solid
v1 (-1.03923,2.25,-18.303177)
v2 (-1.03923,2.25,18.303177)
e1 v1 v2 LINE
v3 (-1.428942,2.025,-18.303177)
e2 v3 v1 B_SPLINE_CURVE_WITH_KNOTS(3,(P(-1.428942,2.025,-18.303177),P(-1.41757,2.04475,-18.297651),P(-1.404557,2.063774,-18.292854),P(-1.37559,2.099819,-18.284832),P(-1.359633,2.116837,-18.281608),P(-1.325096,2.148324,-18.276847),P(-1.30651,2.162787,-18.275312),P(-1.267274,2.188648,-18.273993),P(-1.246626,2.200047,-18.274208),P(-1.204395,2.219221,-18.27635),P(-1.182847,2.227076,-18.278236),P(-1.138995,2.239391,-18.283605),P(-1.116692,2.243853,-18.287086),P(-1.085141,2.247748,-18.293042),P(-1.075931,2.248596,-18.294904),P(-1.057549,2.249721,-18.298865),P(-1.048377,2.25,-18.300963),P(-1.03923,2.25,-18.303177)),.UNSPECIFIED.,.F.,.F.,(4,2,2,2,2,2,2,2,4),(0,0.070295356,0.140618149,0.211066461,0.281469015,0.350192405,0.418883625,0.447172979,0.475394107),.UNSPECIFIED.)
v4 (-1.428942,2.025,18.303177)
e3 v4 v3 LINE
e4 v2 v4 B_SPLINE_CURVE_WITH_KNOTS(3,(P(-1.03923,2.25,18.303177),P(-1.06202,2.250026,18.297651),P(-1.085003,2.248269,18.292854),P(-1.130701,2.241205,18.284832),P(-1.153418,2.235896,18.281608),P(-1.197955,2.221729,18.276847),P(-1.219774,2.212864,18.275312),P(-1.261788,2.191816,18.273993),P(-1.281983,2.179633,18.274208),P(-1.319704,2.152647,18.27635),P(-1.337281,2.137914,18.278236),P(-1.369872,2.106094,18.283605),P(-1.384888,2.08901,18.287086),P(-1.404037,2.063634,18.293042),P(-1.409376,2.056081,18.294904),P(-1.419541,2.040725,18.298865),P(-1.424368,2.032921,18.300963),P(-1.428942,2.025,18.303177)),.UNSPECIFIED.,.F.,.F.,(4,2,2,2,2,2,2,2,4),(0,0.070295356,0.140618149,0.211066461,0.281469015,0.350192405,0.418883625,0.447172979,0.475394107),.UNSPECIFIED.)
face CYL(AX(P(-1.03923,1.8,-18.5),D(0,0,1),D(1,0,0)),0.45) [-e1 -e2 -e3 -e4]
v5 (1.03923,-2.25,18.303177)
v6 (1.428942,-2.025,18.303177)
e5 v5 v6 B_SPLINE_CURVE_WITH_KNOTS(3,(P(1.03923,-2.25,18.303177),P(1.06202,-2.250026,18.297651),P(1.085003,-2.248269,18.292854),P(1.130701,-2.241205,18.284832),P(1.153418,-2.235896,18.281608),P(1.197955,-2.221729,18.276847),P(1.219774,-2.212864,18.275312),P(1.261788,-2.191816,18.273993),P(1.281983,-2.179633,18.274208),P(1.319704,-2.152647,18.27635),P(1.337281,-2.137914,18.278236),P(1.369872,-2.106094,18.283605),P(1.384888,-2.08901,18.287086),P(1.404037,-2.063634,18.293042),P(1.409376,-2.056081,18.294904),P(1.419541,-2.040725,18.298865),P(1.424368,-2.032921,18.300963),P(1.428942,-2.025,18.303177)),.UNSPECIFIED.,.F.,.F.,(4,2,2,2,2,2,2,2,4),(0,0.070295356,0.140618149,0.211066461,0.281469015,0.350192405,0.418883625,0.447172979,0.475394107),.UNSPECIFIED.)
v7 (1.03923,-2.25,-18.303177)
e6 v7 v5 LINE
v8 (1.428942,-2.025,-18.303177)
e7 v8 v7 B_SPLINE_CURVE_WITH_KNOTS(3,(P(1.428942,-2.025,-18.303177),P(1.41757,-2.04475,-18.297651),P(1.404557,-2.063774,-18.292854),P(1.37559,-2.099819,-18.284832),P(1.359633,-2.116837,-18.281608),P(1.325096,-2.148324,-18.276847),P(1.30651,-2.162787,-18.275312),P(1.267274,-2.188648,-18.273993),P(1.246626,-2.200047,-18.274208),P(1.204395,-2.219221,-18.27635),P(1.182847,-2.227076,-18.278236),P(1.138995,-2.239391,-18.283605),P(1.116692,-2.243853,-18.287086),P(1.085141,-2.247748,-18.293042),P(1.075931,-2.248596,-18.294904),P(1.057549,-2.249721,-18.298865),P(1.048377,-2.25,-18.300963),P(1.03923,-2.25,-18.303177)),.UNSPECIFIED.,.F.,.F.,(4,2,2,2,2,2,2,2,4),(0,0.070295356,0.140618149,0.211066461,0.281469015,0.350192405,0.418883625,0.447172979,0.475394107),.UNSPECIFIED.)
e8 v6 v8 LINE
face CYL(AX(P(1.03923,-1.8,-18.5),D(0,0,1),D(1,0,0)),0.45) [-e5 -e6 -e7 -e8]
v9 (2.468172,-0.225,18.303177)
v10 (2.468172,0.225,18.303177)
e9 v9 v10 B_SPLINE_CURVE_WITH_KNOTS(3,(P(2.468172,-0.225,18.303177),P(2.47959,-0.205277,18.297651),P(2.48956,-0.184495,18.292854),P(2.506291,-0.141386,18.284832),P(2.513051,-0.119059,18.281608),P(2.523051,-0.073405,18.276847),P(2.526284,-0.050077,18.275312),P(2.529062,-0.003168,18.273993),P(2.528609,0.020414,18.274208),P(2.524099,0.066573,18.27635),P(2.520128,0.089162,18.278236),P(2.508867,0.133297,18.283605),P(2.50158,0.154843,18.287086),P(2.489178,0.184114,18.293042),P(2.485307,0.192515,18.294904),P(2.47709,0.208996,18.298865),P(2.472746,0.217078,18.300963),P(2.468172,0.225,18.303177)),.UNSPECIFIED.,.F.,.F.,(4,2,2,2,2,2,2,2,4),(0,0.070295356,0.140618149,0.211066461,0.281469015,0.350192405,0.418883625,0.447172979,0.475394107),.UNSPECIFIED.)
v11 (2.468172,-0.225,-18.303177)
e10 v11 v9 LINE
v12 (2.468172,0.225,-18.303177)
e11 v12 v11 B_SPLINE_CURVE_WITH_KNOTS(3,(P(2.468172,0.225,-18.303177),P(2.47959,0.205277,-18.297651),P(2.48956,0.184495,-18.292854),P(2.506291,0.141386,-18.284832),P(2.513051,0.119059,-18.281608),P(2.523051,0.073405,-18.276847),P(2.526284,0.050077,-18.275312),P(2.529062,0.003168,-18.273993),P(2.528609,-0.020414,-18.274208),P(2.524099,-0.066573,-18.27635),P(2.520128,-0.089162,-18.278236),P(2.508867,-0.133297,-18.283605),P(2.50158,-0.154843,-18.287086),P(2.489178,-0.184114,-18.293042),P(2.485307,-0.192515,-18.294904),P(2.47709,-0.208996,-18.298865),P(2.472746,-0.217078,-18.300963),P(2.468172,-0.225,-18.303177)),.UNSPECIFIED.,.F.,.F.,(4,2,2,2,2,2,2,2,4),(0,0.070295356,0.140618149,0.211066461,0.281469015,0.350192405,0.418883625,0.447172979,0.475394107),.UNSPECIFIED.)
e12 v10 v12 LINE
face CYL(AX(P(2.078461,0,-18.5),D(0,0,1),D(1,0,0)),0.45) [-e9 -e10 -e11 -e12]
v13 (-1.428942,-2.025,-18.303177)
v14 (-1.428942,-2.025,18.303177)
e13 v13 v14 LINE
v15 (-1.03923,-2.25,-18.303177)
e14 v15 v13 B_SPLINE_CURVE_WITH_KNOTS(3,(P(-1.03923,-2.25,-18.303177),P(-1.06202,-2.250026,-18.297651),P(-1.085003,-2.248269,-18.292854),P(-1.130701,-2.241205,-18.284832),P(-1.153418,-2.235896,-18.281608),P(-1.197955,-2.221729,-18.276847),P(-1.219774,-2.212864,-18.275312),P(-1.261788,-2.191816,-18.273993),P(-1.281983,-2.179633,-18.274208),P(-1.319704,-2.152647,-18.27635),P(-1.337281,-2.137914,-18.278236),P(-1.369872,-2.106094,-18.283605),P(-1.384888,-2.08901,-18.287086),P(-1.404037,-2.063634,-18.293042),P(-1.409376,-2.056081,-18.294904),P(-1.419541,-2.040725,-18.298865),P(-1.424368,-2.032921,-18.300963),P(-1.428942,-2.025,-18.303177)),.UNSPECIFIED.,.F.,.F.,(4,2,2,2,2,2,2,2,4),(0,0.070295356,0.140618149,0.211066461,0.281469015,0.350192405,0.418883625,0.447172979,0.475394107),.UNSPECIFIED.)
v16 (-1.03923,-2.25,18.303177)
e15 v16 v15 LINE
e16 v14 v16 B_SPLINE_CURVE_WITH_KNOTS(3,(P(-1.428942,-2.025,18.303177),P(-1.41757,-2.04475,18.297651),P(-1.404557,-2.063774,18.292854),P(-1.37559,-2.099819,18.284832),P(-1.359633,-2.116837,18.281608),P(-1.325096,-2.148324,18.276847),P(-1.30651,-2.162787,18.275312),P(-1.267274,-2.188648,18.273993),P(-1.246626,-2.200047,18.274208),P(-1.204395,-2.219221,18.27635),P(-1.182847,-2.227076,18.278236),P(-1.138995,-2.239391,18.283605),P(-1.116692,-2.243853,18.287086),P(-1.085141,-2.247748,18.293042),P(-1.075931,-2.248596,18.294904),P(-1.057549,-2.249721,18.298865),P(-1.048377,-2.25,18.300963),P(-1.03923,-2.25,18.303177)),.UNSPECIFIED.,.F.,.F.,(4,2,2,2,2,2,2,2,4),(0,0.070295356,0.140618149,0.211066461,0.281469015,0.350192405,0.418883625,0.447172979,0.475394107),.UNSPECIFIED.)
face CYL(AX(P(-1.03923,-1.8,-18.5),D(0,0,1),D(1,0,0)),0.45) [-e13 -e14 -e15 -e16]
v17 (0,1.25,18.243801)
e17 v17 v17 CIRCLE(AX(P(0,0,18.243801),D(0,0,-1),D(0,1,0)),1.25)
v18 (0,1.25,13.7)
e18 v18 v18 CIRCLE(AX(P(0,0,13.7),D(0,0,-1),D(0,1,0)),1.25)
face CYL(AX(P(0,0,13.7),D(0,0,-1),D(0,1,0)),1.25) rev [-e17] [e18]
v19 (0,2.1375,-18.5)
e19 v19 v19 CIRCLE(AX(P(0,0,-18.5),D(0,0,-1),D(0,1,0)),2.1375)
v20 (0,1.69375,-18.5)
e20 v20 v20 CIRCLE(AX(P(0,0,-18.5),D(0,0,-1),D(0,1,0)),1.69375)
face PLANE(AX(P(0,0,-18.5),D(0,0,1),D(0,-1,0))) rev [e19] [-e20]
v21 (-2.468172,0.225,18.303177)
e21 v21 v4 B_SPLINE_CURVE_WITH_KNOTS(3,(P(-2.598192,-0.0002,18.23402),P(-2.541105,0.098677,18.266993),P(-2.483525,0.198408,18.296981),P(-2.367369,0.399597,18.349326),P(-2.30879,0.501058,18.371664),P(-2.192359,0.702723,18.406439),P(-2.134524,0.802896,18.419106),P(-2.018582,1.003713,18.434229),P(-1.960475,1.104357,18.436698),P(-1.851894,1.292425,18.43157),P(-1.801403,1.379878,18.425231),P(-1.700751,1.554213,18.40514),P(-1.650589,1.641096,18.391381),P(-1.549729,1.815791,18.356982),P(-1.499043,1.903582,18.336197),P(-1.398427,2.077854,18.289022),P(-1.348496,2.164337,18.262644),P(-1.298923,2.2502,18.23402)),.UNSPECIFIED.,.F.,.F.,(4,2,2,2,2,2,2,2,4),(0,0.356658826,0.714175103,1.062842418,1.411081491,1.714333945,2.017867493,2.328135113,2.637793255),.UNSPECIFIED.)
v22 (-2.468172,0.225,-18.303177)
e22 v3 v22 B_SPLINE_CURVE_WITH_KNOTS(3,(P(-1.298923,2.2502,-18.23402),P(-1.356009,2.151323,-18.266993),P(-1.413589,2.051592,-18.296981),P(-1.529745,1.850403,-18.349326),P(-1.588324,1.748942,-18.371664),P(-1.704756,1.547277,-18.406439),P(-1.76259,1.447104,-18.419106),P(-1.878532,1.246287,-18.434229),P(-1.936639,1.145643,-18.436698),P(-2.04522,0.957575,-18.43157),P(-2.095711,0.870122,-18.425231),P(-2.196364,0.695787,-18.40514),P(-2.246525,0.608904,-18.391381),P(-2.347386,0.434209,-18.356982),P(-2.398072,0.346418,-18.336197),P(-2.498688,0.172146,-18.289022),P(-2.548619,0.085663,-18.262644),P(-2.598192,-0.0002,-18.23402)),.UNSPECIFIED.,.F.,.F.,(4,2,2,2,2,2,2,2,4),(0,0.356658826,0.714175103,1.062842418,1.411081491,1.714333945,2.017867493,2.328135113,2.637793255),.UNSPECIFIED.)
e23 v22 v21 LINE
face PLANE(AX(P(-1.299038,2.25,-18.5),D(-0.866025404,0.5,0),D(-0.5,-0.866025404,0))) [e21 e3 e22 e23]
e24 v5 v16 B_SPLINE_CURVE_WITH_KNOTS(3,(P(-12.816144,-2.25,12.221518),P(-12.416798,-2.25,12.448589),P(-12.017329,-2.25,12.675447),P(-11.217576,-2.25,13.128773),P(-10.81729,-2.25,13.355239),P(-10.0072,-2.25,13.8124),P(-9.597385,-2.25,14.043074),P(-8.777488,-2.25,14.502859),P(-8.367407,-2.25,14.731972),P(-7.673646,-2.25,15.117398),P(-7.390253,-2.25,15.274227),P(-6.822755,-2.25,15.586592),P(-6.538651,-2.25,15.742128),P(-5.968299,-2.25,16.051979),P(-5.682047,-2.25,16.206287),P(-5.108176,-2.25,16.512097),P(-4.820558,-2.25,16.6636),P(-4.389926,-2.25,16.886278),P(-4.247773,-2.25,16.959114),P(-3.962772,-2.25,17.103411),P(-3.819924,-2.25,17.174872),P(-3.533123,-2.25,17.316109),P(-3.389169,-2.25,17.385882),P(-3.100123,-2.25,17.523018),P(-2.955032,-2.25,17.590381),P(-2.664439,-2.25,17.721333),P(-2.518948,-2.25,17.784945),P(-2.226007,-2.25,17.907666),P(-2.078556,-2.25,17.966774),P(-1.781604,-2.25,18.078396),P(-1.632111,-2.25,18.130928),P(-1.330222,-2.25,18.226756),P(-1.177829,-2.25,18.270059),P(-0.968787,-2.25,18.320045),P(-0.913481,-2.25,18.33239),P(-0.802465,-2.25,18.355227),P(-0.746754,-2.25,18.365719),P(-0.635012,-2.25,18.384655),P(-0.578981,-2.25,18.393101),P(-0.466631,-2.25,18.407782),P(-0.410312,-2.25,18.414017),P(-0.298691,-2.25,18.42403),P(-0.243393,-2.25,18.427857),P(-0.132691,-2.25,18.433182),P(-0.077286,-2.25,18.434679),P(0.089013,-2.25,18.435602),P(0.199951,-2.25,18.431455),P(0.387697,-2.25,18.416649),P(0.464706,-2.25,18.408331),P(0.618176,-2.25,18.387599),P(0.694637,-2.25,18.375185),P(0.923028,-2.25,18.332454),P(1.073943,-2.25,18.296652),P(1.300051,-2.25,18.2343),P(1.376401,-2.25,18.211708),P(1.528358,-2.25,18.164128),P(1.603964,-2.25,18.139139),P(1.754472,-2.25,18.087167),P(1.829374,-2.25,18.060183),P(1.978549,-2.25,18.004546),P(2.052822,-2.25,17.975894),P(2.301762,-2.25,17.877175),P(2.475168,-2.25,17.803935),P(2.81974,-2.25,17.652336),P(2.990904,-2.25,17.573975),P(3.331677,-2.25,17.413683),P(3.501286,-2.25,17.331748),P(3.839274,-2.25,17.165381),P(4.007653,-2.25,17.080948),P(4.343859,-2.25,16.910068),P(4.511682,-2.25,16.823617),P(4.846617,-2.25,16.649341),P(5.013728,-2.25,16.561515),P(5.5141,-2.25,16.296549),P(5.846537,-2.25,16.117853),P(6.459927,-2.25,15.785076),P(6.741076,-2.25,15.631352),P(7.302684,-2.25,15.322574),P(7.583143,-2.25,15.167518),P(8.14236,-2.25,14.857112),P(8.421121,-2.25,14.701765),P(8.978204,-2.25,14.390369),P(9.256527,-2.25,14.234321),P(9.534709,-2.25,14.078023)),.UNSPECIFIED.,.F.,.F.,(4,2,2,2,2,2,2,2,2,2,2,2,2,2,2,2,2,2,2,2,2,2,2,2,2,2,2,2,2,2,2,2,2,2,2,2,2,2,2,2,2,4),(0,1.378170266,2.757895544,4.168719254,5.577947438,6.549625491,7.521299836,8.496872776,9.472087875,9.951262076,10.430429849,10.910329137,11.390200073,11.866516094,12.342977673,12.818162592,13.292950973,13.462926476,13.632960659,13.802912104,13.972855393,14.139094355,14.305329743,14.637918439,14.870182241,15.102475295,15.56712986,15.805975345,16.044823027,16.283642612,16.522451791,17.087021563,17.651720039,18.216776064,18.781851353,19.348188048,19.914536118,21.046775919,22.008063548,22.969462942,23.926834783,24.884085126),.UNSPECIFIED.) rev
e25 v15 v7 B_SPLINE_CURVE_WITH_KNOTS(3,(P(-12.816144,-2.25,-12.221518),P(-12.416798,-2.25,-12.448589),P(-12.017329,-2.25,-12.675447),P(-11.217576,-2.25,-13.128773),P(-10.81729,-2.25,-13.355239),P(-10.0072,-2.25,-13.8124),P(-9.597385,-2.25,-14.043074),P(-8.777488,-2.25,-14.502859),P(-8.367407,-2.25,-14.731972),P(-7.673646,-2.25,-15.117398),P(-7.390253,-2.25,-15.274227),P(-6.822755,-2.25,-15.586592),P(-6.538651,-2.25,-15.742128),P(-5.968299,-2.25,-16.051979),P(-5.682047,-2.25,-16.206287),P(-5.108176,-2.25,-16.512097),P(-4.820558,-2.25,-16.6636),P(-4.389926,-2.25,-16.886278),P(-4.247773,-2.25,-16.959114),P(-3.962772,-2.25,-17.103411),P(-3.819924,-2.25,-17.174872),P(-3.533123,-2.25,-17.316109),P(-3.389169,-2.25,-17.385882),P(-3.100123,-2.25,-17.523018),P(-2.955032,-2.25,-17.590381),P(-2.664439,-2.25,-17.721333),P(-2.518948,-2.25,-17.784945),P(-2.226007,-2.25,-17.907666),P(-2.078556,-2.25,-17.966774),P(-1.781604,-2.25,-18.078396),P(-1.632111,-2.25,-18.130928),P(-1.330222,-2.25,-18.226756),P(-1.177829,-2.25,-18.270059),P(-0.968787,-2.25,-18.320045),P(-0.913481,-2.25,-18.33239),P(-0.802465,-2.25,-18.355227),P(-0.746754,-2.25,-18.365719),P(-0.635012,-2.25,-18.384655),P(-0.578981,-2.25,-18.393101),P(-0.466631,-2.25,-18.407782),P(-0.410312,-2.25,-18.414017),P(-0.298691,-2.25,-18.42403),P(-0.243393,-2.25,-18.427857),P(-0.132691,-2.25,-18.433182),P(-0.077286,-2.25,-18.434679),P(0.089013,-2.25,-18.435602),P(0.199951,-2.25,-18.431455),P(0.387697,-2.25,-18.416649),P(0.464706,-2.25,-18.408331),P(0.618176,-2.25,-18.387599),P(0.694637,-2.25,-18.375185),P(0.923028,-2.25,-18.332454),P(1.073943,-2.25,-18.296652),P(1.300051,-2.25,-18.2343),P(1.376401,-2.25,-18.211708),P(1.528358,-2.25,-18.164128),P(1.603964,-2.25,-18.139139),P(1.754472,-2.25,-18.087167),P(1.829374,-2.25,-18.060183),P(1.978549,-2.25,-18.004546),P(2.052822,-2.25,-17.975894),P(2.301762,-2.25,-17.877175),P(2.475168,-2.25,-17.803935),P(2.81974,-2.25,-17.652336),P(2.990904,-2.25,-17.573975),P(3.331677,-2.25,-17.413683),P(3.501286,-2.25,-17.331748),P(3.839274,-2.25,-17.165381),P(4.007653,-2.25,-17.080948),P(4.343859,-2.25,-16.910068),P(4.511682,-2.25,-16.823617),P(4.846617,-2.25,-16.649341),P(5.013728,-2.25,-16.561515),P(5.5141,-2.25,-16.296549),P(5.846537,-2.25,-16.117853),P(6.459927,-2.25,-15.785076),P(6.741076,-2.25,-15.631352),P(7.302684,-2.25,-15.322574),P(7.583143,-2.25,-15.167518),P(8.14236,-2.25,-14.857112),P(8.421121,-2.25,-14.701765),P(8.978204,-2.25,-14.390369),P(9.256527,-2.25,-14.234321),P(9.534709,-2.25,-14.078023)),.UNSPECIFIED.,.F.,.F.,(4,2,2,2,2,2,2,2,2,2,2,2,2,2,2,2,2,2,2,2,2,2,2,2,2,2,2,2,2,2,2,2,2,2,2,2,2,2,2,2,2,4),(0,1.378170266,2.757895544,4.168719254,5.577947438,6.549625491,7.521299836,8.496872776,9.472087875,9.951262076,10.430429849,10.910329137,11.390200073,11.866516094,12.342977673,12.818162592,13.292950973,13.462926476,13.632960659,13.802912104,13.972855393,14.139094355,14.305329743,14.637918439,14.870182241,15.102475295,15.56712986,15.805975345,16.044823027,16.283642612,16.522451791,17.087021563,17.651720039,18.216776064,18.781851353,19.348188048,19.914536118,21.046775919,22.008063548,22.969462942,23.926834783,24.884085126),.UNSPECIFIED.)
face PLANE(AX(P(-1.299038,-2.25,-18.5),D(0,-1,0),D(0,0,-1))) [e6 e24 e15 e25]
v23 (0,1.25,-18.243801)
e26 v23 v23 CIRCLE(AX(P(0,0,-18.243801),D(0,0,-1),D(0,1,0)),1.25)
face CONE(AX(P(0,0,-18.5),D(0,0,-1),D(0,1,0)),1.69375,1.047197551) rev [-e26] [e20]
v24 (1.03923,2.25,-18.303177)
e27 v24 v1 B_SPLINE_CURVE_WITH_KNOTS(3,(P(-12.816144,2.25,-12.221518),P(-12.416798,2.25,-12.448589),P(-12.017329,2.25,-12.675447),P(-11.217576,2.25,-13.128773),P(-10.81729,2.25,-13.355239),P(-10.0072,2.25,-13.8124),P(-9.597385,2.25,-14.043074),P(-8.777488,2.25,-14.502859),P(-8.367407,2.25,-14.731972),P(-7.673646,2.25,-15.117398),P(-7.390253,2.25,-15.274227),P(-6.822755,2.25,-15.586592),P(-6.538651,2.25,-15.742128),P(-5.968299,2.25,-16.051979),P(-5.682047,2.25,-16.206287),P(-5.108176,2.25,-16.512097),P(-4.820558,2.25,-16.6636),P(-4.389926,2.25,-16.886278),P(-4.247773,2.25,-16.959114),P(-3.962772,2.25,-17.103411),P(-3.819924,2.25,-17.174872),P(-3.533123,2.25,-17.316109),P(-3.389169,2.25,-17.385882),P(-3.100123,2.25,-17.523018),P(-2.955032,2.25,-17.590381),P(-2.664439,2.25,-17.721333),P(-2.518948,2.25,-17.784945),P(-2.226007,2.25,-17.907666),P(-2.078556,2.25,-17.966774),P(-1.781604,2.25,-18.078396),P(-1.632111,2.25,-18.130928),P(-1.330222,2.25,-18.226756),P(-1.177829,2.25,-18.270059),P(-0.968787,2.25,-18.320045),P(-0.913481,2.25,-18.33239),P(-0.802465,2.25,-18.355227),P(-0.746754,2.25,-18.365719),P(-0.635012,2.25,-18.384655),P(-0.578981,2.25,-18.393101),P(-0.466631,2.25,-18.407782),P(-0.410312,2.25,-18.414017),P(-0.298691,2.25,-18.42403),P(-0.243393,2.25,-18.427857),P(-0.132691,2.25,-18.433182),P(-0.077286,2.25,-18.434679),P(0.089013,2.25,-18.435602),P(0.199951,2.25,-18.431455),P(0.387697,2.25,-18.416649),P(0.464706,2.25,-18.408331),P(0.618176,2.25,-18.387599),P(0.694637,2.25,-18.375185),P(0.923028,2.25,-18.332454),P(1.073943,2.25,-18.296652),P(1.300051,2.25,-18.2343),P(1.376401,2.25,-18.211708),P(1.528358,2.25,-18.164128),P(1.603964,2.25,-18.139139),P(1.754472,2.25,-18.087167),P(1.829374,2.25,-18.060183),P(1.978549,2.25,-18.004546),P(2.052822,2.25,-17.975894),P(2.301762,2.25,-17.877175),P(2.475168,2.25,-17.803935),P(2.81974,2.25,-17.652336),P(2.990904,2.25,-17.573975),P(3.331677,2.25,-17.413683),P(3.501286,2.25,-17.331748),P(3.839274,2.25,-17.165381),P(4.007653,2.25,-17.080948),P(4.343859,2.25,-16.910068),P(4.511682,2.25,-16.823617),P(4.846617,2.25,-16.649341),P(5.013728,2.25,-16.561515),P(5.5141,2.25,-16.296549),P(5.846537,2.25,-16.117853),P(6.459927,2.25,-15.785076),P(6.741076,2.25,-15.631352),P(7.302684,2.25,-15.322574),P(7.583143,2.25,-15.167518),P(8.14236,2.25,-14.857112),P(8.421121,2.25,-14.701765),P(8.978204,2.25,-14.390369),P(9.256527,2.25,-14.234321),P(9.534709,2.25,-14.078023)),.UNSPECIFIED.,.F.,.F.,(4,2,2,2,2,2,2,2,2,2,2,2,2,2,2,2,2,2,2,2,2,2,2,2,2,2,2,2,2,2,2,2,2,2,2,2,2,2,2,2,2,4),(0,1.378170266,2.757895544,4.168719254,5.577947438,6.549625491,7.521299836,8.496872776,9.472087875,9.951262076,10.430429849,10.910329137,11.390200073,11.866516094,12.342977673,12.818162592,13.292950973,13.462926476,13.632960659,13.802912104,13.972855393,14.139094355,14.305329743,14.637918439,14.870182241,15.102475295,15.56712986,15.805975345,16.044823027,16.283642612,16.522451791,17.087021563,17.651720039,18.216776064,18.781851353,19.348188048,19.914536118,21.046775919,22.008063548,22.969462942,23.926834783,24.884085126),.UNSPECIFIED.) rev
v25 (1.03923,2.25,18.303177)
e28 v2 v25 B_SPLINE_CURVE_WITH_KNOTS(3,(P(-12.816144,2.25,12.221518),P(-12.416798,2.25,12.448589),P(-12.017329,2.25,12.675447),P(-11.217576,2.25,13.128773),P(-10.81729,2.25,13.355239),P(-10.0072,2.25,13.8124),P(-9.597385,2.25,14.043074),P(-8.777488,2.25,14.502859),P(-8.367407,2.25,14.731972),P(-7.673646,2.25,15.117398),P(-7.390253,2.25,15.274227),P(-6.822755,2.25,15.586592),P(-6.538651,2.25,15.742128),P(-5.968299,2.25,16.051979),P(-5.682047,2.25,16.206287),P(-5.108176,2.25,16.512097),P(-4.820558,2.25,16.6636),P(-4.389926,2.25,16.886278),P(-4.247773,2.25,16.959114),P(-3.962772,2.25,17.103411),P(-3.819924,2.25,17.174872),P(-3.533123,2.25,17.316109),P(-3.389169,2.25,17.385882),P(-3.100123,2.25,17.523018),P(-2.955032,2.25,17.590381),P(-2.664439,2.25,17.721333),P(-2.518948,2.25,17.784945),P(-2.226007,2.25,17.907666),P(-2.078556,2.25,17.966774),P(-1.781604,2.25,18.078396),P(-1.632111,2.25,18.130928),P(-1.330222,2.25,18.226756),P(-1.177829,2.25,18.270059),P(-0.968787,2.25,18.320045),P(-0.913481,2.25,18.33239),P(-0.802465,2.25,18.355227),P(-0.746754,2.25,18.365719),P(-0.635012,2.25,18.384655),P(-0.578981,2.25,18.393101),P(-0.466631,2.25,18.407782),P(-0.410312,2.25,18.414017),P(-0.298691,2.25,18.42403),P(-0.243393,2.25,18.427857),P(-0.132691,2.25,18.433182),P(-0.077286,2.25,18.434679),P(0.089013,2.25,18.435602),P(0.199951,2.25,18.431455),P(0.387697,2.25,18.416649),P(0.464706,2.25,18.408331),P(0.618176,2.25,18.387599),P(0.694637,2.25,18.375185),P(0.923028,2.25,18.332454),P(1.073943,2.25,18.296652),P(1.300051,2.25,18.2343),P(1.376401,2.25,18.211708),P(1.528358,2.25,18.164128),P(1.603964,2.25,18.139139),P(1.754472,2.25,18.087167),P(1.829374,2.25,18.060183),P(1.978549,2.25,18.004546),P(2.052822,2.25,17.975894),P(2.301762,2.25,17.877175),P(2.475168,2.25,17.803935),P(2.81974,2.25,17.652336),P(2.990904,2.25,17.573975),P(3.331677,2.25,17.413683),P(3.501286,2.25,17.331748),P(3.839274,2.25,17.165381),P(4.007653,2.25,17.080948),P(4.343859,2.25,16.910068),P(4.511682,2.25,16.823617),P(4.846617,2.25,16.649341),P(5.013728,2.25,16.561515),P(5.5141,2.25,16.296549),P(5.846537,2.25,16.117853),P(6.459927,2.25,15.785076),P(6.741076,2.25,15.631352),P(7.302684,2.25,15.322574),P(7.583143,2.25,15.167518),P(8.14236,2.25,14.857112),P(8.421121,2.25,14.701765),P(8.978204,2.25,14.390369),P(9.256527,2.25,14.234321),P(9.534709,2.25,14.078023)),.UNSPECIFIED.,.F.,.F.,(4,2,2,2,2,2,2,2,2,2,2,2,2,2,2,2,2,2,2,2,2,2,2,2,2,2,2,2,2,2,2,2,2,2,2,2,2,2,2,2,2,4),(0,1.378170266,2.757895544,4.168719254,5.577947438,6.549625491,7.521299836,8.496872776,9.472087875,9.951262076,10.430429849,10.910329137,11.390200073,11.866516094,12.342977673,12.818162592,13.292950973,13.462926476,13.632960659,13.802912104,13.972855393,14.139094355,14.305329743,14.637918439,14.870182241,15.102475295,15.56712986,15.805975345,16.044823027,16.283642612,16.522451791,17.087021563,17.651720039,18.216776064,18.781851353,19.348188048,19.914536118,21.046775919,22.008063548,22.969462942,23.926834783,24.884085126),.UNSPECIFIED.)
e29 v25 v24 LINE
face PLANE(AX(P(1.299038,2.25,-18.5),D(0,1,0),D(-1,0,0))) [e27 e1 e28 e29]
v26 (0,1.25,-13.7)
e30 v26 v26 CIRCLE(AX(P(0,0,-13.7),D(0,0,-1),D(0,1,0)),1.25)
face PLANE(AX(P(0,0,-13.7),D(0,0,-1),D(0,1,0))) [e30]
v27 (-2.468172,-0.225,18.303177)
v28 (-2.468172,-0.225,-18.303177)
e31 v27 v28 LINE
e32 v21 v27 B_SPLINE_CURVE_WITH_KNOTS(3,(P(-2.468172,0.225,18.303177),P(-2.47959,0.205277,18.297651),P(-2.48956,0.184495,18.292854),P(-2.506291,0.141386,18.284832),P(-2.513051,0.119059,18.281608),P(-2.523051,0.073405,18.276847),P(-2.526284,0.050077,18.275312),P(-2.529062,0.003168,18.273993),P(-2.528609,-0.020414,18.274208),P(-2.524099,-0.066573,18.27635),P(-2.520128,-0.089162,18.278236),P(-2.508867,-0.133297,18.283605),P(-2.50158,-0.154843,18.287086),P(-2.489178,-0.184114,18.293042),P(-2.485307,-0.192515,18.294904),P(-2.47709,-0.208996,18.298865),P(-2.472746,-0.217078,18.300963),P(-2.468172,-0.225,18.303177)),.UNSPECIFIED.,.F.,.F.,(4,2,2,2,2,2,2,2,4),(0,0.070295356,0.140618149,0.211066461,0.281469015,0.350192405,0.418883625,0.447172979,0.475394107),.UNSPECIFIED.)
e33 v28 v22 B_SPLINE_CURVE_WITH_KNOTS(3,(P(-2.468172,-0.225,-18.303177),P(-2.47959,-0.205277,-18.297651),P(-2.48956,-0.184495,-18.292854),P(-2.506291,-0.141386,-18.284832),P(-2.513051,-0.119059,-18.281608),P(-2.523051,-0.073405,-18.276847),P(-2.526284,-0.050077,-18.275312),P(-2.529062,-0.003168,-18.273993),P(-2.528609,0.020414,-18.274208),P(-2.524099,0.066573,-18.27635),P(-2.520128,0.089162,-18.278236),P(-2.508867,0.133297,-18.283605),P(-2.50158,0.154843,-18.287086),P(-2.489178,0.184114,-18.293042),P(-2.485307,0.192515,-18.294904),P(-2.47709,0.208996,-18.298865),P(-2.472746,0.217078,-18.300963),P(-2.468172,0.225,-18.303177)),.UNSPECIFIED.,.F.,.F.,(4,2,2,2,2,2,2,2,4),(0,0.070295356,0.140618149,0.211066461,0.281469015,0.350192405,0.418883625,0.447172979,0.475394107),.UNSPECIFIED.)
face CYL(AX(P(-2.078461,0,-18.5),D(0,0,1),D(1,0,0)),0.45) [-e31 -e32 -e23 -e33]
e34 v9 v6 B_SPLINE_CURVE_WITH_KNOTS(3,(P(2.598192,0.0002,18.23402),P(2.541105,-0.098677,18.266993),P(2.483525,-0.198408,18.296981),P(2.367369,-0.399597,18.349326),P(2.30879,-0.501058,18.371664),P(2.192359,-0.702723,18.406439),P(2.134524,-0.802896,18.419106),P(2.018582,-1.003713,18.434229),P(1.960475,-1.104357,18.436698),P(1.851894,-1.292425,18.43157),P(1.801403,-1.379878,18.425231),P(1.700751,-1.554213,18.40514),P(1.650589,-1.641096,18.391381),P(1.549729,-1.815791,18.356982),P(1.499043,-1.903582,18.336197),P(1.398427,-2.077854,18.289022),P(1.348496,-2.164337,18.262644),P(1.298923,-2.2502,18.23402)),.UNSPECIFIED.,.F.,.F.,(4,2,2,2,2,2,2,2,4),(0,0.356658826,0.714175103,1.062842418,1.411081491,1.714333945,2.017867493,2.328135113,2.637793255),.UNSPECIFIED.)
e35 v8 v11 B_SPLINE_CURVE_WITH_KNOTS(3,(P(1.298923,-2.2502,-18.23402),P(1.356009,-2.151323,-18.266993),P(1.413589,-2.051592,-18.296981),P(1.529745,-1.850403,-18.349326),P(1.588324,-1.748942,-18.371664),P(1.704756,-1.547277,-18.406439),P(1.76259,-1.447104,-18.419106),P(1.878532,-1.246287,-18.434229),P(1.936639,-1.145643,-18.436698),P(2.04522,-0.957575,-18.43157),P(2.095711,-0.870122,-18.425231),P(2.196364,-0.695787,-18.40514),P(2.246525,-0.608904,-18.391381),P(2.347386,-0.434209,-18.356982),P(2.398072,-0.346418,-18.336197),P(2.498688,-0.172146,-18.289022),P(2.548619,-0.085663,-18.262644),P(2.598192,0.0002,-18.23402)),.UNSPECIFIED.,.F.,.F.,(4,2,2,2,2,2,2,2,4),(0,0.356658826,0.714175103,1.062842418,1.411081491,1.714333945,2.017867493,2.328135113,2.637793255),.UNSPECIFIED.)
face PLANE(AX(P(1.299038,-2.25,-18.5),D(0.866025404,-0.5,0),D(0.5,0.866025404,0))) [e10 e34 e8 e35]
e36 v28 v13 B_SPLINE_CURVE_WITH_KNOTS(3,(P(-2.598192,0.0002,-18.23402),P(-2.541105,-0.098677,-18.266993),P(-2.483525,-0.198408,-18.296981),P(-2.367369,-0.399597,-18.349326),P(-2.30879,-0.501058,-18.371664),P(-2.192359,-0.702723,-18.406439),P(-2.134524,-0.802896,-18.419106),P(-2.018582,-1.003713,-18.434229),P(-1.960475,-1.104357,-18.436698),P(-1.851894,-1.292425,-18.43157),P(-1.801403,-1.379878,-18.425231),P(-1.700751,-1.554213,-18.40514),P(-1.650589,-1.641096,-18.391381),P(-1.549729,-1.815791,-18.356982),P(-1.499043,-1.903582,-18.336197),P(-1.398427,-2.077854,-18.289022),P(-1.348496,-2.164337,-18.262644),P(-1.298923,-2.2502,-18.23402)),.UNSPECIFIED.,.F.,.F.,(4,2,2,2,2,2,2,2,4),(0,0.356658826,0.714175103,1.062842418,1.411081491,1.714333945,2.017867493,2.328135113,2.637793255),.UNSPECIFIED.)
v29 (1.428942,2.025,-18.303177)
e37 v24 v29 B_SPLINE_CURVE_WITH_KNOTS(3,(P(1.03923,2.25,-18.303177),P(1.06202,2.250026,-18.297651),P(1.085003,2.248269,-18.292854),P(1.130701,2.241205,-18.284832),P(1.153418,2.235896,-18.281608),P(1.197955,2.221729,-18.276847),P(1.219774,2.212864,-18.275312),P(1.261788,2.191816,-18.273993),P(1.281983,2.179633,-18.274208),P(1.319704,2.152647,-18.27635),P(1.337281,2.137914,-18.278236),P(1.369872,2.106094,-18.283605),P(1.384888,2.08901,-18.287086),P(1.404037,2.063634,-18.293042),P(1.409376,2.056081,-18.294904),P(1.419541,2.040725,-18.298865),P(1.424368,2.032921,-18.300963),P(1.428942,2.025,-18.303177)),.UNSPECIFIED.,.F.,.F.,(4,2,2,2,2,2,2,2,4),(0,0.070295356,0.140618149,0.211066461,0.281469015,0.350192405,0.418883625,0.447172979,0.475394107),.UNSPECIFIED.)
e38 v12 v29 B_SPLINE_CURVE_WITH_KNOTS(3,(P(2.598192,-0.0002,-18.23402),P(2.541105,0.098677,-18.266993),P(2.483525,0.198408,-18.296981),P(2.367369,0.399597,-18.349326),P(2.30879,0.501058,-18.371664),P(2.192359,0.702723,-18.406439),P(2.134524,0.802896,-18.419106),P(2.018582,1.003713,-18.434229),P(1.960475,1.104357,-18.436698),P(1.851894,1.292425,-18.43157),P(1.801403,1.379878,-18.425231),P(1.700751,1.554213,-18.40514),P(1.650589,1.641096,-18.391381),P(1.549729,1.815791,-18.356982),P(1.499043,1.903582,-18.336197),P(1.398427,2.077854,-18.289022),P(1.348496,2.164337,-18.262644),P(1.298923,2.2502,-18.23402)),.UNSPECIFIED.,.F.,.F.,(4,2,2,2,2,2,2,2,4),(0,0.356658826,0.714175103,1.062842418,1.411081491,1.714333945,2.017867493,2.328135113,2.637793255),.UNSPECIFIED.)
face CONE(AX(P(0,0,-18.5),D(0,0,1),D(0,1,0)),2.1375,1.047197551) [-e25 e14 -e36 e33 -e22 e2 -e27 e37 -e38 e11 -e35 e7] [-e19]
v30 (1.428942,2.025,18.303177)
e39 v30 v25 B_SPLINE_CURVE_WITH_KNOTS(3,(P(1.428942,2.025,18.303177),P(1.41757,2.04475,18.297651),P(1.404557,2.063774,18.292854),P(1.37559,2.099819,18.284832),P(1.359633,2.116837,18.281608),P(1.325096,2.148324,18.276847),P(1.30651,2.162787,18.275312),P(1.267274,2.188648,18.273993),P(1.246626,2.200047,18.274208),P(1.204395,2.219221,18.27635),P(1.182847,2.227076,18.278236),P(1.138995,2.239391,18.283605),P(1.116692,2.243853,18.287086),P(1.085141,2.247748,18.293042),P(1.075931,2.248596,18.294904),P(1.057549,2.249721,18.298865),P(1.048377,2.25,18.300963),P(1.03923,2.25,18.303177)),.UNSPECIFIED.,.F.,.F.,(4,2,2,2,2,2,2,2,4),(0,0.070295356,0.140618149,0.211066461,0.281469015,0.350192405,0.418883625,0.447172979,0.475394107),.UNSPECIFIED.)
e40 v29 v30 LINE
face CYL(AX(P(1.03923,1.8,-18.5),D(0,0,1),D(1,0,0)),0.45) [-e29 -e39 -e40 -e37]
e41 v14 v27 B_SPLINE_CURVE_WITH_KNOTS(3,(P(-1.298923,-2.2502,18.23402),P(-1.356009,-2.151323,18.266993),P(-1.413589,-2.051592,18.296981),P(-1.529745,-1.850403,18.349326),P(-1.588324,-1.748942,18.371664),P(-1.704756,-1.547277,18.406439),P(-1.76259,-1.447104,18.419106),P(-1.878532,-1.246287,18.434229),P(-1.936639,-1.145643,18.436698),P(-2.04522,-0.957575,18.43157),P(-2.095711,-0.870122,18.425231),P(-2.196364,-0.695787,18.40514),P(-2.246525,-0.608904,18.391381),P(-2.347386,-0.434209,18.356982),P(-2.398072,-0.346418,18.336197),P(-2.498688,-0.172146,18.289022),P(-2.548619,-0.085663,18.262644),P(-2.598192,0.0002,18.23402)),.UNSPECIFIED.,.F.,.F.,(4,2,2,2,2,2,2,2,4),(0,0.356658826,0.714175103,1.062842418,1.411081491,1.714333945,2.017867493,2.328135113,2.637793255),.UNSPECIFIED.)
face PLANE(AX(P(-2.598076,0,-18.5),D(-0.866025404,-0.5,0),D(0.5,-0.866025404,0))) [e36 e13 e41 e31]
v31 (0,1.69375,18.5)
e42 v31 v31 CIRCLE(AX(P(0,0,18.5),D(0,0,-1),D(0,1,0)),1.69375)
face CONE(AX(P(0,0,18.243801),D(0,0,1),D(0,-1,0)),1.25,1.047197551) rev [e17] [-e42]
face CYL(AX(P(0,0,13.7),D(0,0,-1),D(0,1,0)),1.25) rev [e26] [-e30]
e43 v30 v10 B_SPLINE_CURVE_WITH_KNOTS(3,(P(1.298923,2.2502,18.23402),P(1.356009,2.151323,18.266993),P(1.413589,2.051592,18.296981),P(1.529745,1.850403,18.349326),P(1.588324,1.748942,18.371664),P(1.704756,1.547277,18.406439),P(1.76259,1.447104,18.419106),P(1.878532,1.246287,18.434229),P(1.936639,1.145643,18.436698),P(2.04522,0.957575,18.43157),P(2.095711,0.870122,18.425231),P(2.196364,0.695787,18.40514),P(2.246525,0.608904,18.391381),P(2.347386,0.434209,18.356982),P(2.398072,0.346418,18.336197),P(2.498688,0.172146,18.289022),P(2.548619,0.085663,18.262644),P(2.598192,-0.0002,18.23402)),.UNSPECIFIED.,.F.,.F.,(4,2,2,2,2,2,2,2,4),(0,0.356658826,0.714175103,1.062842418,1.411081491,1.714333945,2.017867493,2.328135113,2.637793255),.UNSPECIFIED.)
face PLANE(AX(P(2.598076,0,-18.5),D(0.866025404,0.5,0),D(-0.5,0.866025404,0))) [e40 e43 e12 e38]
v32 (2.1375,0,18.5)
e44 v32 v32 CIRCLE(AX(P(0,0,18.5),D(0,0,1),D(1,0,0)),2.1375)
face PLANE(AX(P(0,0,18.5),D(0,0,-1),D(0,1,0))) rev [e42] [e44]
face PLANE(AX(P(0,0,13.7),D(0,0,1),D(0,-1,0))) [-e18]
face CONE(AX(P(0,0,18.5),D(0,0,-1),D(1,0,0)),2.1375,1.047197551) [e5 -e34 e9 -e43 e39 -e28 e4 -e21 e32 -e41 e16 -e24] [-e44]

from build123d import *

# Parameters (mm, degrees)
SKETCH4_R           = 1.75
BOSS_EXTRUDE1_DEPTH = 18.5
SKETCH5_OUTSIDE_W   = 146.91
SKETCH5_OUTSIDE_H   = 146.214
SKETCH5_OUTSIDE_R   = 2.1375
CUT_EXTRUDE1_DEPTH  = 38.159285515
CUT_EXTRUDE1_DRAFT  = -60
SKETCH6_OUTSIDE_W   = 146.91
SKETCH6_OUTSIDE_H   = 146.214
SKETCH6_OUTSIDE_R   = 2.1375
CUT_EXTRUDE2_DEPTH  = 38.159285515
CUT_EXTRUDE2_DRAFT  = -60
FILLET1_R           = 0.45


with BuildPart() as part:
    # Sketch3 → Revolve1 (revolve)
    with BuildSketch(Plane(origin=(0, 0, 0), x_dir=(0, 0, -1), z_dir=(1, 0, 0))):
        Polygon((-18.243800818, 1.25), (-13.7, 1.25), (-13.7, 0), (13.7, 0), (13.7, 1.25), (18.243800818, 1.25), (18.5, 1.69375), (18.5, 2.25), (0, 2.25), (-18.5, 2.25), (-18.5, 1.69375), align=None)
        Polygon((-18.243800818, 1.25), (-13.7, 1.25), (-13.7, 0), (13.7, 0), (13.7, 1.25), (18.243800818, 1.25), (18.5, 1.69375), (18.5, 2.25), (0, 2.25), (-18.5, 2.25), (-18.5, 1.69375), align=None)
    revolve(axis=Axis((0, 0, 13.7), (0, 0, 1)))

    # Sketch4 → Boss-Extrude1 (add, symmetric)
    with BuildSketch(Plane.XY):
        Polygon((-1.299038106, 2.25), (-2.598076211, 0), (-1.299038106, -2.25), (1.299038106, -2.25), (2.598076211, 0), (1.299038106, 2.25), align=None)
        Circle(SKETCH4_R, mode=Mode.SUBTRACT)
    extrude(amount=BOSS_EXTRUDE1_DEPTH, both=True)


with BuildPart() as cut_extrude1_tool:
    # Sketch5 outside → Cut-Extrude1 (with draft: the straight prism first)
    with BuildSketch(Plane.XY.offset(18.5)):
        Rectangle(SKETCH5_OUTSIDE_W, SKETCH5_OUTSIDE_H)
        Circle(SKETCH5_OUTSIDE_R, mode=Mode.SUBTRACT)
    extrude(amount=-CUT_EXTRUDE1_DEPTH)
    # Cut-Extrude1: the draft: its side faces are tilted about the plane it starts from
    cut_extrude1_sides = [cut_extrude1_tool.faces().sort_by_distance(p)[0] for p in [
        (0, -73.107, -0.579642758),
        (73.455, 0, -0.579642758),
        (0, 73.107, -0.579642758),
        (-73.455, 0, -0.579642758),
        (-2.1375, 0, -0.579642758),
    ]]
    draft(cut_extrude1_sides, Plane.XY.offset(18.5), CUT_EXTRUDE1_DRAFT)


with BuildPart() as part_1:
    add(part.part)

    # Cut-Extrude1: cut by cut_extrude1_tool
    add(cut_extrude1_tool.part, mode=Mode.SUBTRACT)


with BuildPart() as cut_extrude2_tool:
    # Sketch6 outside → Cut-Extrude2 (with draft: the straight prism first)
    with BuildSketch(Plane(origin=(0, 0, -18.5), x_dir=(-1, 0, 0), z_dir=(0, 0, -1))):
        Rectangle(SKETCH6_OUTSIDE_W, SKETCH6_OUTSIDE_H)
        Circle(SKETCH6_OUTSIDE_R, mode=Mode.SUBTRACT)
    extrude(amount=-CUT_EXTRUDE2_DEPTH)
    # Cut-Extrude2: the draft: its side faces are tilted about the plane it starts from
    cut_extrude2_sides = [cut_extrude2_tool.faces().sort_by_distance(p)[0] for p in [
        (0, -73.107, 0.579642758),
        (-73.455, 0, 0.579642758),
        (0, 73.107, 0.579642758),
        (73.455, 0, 0.579642758),
        (2.1375, 0, 0.579642758),
    ]]
    draft(cut_extrude2_sides, Plane(origin=(0, 0, -18.5), x_dir=(-1, 0, 0), z_dir=(0, 0, -1)), CUT_EXTRUDE2_DRAFT)


with BuildPart() as part_2:
    add(part_1.part)

    # Cut-Extrude2: cut by cut_extrude2_tool
    add(cut_extrude2_tool.part, mode=Mode.SUBTRACT)

    # Fillet1
    # the kernel refuses this fillet: 0.45 mm, written as the material it takes off along each edge
    with BuildSketch(Plane(origin=(1.299038106, 2.25, 18.883605253), x_dir=(-1, 0, 0), z_dir=(0, 0, -1)), Plane(origin=(-1.299038106, 2.25, 18.883605253), x_dir=(-0.49999999999999967, -0.8660254037844387, 0), z_dir=(0, 0, -1))) as fillet1_piece_1:
        with BuildLine():
            CenterArc((FILLET1_R * 0.57735026919, -FILLET1_R), FILLET1_R, 90, 60)
            Line((-FILLET1_R * 0.288675134595, -FILLET1_R * 0.5), (0, 0))
            Line((0, 0), (FILLET1_R * 0.57735026919, 0))
        make_face()
    extrude(amount=37.767210506, mode=Mode.SUBTRACT)
    with BuildSketch(Plane(origin=(-2.598076211, 0, -18.883605253), x_dir=(0.5000000000000006, -0.8660254037844384, 0), z_dir=(0, 0, 1)), Plane(origin=(-1.299038106, -2.25, -18.883605253), x_dir=(1, 0, 0), z_dir=(0, 0, 1)), Plane(origin=(1.299038106, -2.25, -18.883605253), x_dir=(0.49999999999999967, 0.8660254037844387, 0), z_dir=(0, 0, 1)), Plane(origin=(2.598076211, 0, 18.883605253), x_dir=(-0.5, -0.8660254037844388, 0), z_dir=(0, 0, -1))) as fillet1_piece_2:
        with BuildLine():
            CenterArc((FILLET1_R * 0.57735026919, FILLET1_R), FILLET1_R, 210, 60)
            Line((-FILLET1_R * 0.288675134595, FILLET1_R * 0.5), (0, 0))
            Line((0, 0), (FILLET1_R * 0.57735026919, 0))
        make_face()
    extrude(amount=37.767210506, mode=Mode.SUBTRACT)


solid = part_2.part
